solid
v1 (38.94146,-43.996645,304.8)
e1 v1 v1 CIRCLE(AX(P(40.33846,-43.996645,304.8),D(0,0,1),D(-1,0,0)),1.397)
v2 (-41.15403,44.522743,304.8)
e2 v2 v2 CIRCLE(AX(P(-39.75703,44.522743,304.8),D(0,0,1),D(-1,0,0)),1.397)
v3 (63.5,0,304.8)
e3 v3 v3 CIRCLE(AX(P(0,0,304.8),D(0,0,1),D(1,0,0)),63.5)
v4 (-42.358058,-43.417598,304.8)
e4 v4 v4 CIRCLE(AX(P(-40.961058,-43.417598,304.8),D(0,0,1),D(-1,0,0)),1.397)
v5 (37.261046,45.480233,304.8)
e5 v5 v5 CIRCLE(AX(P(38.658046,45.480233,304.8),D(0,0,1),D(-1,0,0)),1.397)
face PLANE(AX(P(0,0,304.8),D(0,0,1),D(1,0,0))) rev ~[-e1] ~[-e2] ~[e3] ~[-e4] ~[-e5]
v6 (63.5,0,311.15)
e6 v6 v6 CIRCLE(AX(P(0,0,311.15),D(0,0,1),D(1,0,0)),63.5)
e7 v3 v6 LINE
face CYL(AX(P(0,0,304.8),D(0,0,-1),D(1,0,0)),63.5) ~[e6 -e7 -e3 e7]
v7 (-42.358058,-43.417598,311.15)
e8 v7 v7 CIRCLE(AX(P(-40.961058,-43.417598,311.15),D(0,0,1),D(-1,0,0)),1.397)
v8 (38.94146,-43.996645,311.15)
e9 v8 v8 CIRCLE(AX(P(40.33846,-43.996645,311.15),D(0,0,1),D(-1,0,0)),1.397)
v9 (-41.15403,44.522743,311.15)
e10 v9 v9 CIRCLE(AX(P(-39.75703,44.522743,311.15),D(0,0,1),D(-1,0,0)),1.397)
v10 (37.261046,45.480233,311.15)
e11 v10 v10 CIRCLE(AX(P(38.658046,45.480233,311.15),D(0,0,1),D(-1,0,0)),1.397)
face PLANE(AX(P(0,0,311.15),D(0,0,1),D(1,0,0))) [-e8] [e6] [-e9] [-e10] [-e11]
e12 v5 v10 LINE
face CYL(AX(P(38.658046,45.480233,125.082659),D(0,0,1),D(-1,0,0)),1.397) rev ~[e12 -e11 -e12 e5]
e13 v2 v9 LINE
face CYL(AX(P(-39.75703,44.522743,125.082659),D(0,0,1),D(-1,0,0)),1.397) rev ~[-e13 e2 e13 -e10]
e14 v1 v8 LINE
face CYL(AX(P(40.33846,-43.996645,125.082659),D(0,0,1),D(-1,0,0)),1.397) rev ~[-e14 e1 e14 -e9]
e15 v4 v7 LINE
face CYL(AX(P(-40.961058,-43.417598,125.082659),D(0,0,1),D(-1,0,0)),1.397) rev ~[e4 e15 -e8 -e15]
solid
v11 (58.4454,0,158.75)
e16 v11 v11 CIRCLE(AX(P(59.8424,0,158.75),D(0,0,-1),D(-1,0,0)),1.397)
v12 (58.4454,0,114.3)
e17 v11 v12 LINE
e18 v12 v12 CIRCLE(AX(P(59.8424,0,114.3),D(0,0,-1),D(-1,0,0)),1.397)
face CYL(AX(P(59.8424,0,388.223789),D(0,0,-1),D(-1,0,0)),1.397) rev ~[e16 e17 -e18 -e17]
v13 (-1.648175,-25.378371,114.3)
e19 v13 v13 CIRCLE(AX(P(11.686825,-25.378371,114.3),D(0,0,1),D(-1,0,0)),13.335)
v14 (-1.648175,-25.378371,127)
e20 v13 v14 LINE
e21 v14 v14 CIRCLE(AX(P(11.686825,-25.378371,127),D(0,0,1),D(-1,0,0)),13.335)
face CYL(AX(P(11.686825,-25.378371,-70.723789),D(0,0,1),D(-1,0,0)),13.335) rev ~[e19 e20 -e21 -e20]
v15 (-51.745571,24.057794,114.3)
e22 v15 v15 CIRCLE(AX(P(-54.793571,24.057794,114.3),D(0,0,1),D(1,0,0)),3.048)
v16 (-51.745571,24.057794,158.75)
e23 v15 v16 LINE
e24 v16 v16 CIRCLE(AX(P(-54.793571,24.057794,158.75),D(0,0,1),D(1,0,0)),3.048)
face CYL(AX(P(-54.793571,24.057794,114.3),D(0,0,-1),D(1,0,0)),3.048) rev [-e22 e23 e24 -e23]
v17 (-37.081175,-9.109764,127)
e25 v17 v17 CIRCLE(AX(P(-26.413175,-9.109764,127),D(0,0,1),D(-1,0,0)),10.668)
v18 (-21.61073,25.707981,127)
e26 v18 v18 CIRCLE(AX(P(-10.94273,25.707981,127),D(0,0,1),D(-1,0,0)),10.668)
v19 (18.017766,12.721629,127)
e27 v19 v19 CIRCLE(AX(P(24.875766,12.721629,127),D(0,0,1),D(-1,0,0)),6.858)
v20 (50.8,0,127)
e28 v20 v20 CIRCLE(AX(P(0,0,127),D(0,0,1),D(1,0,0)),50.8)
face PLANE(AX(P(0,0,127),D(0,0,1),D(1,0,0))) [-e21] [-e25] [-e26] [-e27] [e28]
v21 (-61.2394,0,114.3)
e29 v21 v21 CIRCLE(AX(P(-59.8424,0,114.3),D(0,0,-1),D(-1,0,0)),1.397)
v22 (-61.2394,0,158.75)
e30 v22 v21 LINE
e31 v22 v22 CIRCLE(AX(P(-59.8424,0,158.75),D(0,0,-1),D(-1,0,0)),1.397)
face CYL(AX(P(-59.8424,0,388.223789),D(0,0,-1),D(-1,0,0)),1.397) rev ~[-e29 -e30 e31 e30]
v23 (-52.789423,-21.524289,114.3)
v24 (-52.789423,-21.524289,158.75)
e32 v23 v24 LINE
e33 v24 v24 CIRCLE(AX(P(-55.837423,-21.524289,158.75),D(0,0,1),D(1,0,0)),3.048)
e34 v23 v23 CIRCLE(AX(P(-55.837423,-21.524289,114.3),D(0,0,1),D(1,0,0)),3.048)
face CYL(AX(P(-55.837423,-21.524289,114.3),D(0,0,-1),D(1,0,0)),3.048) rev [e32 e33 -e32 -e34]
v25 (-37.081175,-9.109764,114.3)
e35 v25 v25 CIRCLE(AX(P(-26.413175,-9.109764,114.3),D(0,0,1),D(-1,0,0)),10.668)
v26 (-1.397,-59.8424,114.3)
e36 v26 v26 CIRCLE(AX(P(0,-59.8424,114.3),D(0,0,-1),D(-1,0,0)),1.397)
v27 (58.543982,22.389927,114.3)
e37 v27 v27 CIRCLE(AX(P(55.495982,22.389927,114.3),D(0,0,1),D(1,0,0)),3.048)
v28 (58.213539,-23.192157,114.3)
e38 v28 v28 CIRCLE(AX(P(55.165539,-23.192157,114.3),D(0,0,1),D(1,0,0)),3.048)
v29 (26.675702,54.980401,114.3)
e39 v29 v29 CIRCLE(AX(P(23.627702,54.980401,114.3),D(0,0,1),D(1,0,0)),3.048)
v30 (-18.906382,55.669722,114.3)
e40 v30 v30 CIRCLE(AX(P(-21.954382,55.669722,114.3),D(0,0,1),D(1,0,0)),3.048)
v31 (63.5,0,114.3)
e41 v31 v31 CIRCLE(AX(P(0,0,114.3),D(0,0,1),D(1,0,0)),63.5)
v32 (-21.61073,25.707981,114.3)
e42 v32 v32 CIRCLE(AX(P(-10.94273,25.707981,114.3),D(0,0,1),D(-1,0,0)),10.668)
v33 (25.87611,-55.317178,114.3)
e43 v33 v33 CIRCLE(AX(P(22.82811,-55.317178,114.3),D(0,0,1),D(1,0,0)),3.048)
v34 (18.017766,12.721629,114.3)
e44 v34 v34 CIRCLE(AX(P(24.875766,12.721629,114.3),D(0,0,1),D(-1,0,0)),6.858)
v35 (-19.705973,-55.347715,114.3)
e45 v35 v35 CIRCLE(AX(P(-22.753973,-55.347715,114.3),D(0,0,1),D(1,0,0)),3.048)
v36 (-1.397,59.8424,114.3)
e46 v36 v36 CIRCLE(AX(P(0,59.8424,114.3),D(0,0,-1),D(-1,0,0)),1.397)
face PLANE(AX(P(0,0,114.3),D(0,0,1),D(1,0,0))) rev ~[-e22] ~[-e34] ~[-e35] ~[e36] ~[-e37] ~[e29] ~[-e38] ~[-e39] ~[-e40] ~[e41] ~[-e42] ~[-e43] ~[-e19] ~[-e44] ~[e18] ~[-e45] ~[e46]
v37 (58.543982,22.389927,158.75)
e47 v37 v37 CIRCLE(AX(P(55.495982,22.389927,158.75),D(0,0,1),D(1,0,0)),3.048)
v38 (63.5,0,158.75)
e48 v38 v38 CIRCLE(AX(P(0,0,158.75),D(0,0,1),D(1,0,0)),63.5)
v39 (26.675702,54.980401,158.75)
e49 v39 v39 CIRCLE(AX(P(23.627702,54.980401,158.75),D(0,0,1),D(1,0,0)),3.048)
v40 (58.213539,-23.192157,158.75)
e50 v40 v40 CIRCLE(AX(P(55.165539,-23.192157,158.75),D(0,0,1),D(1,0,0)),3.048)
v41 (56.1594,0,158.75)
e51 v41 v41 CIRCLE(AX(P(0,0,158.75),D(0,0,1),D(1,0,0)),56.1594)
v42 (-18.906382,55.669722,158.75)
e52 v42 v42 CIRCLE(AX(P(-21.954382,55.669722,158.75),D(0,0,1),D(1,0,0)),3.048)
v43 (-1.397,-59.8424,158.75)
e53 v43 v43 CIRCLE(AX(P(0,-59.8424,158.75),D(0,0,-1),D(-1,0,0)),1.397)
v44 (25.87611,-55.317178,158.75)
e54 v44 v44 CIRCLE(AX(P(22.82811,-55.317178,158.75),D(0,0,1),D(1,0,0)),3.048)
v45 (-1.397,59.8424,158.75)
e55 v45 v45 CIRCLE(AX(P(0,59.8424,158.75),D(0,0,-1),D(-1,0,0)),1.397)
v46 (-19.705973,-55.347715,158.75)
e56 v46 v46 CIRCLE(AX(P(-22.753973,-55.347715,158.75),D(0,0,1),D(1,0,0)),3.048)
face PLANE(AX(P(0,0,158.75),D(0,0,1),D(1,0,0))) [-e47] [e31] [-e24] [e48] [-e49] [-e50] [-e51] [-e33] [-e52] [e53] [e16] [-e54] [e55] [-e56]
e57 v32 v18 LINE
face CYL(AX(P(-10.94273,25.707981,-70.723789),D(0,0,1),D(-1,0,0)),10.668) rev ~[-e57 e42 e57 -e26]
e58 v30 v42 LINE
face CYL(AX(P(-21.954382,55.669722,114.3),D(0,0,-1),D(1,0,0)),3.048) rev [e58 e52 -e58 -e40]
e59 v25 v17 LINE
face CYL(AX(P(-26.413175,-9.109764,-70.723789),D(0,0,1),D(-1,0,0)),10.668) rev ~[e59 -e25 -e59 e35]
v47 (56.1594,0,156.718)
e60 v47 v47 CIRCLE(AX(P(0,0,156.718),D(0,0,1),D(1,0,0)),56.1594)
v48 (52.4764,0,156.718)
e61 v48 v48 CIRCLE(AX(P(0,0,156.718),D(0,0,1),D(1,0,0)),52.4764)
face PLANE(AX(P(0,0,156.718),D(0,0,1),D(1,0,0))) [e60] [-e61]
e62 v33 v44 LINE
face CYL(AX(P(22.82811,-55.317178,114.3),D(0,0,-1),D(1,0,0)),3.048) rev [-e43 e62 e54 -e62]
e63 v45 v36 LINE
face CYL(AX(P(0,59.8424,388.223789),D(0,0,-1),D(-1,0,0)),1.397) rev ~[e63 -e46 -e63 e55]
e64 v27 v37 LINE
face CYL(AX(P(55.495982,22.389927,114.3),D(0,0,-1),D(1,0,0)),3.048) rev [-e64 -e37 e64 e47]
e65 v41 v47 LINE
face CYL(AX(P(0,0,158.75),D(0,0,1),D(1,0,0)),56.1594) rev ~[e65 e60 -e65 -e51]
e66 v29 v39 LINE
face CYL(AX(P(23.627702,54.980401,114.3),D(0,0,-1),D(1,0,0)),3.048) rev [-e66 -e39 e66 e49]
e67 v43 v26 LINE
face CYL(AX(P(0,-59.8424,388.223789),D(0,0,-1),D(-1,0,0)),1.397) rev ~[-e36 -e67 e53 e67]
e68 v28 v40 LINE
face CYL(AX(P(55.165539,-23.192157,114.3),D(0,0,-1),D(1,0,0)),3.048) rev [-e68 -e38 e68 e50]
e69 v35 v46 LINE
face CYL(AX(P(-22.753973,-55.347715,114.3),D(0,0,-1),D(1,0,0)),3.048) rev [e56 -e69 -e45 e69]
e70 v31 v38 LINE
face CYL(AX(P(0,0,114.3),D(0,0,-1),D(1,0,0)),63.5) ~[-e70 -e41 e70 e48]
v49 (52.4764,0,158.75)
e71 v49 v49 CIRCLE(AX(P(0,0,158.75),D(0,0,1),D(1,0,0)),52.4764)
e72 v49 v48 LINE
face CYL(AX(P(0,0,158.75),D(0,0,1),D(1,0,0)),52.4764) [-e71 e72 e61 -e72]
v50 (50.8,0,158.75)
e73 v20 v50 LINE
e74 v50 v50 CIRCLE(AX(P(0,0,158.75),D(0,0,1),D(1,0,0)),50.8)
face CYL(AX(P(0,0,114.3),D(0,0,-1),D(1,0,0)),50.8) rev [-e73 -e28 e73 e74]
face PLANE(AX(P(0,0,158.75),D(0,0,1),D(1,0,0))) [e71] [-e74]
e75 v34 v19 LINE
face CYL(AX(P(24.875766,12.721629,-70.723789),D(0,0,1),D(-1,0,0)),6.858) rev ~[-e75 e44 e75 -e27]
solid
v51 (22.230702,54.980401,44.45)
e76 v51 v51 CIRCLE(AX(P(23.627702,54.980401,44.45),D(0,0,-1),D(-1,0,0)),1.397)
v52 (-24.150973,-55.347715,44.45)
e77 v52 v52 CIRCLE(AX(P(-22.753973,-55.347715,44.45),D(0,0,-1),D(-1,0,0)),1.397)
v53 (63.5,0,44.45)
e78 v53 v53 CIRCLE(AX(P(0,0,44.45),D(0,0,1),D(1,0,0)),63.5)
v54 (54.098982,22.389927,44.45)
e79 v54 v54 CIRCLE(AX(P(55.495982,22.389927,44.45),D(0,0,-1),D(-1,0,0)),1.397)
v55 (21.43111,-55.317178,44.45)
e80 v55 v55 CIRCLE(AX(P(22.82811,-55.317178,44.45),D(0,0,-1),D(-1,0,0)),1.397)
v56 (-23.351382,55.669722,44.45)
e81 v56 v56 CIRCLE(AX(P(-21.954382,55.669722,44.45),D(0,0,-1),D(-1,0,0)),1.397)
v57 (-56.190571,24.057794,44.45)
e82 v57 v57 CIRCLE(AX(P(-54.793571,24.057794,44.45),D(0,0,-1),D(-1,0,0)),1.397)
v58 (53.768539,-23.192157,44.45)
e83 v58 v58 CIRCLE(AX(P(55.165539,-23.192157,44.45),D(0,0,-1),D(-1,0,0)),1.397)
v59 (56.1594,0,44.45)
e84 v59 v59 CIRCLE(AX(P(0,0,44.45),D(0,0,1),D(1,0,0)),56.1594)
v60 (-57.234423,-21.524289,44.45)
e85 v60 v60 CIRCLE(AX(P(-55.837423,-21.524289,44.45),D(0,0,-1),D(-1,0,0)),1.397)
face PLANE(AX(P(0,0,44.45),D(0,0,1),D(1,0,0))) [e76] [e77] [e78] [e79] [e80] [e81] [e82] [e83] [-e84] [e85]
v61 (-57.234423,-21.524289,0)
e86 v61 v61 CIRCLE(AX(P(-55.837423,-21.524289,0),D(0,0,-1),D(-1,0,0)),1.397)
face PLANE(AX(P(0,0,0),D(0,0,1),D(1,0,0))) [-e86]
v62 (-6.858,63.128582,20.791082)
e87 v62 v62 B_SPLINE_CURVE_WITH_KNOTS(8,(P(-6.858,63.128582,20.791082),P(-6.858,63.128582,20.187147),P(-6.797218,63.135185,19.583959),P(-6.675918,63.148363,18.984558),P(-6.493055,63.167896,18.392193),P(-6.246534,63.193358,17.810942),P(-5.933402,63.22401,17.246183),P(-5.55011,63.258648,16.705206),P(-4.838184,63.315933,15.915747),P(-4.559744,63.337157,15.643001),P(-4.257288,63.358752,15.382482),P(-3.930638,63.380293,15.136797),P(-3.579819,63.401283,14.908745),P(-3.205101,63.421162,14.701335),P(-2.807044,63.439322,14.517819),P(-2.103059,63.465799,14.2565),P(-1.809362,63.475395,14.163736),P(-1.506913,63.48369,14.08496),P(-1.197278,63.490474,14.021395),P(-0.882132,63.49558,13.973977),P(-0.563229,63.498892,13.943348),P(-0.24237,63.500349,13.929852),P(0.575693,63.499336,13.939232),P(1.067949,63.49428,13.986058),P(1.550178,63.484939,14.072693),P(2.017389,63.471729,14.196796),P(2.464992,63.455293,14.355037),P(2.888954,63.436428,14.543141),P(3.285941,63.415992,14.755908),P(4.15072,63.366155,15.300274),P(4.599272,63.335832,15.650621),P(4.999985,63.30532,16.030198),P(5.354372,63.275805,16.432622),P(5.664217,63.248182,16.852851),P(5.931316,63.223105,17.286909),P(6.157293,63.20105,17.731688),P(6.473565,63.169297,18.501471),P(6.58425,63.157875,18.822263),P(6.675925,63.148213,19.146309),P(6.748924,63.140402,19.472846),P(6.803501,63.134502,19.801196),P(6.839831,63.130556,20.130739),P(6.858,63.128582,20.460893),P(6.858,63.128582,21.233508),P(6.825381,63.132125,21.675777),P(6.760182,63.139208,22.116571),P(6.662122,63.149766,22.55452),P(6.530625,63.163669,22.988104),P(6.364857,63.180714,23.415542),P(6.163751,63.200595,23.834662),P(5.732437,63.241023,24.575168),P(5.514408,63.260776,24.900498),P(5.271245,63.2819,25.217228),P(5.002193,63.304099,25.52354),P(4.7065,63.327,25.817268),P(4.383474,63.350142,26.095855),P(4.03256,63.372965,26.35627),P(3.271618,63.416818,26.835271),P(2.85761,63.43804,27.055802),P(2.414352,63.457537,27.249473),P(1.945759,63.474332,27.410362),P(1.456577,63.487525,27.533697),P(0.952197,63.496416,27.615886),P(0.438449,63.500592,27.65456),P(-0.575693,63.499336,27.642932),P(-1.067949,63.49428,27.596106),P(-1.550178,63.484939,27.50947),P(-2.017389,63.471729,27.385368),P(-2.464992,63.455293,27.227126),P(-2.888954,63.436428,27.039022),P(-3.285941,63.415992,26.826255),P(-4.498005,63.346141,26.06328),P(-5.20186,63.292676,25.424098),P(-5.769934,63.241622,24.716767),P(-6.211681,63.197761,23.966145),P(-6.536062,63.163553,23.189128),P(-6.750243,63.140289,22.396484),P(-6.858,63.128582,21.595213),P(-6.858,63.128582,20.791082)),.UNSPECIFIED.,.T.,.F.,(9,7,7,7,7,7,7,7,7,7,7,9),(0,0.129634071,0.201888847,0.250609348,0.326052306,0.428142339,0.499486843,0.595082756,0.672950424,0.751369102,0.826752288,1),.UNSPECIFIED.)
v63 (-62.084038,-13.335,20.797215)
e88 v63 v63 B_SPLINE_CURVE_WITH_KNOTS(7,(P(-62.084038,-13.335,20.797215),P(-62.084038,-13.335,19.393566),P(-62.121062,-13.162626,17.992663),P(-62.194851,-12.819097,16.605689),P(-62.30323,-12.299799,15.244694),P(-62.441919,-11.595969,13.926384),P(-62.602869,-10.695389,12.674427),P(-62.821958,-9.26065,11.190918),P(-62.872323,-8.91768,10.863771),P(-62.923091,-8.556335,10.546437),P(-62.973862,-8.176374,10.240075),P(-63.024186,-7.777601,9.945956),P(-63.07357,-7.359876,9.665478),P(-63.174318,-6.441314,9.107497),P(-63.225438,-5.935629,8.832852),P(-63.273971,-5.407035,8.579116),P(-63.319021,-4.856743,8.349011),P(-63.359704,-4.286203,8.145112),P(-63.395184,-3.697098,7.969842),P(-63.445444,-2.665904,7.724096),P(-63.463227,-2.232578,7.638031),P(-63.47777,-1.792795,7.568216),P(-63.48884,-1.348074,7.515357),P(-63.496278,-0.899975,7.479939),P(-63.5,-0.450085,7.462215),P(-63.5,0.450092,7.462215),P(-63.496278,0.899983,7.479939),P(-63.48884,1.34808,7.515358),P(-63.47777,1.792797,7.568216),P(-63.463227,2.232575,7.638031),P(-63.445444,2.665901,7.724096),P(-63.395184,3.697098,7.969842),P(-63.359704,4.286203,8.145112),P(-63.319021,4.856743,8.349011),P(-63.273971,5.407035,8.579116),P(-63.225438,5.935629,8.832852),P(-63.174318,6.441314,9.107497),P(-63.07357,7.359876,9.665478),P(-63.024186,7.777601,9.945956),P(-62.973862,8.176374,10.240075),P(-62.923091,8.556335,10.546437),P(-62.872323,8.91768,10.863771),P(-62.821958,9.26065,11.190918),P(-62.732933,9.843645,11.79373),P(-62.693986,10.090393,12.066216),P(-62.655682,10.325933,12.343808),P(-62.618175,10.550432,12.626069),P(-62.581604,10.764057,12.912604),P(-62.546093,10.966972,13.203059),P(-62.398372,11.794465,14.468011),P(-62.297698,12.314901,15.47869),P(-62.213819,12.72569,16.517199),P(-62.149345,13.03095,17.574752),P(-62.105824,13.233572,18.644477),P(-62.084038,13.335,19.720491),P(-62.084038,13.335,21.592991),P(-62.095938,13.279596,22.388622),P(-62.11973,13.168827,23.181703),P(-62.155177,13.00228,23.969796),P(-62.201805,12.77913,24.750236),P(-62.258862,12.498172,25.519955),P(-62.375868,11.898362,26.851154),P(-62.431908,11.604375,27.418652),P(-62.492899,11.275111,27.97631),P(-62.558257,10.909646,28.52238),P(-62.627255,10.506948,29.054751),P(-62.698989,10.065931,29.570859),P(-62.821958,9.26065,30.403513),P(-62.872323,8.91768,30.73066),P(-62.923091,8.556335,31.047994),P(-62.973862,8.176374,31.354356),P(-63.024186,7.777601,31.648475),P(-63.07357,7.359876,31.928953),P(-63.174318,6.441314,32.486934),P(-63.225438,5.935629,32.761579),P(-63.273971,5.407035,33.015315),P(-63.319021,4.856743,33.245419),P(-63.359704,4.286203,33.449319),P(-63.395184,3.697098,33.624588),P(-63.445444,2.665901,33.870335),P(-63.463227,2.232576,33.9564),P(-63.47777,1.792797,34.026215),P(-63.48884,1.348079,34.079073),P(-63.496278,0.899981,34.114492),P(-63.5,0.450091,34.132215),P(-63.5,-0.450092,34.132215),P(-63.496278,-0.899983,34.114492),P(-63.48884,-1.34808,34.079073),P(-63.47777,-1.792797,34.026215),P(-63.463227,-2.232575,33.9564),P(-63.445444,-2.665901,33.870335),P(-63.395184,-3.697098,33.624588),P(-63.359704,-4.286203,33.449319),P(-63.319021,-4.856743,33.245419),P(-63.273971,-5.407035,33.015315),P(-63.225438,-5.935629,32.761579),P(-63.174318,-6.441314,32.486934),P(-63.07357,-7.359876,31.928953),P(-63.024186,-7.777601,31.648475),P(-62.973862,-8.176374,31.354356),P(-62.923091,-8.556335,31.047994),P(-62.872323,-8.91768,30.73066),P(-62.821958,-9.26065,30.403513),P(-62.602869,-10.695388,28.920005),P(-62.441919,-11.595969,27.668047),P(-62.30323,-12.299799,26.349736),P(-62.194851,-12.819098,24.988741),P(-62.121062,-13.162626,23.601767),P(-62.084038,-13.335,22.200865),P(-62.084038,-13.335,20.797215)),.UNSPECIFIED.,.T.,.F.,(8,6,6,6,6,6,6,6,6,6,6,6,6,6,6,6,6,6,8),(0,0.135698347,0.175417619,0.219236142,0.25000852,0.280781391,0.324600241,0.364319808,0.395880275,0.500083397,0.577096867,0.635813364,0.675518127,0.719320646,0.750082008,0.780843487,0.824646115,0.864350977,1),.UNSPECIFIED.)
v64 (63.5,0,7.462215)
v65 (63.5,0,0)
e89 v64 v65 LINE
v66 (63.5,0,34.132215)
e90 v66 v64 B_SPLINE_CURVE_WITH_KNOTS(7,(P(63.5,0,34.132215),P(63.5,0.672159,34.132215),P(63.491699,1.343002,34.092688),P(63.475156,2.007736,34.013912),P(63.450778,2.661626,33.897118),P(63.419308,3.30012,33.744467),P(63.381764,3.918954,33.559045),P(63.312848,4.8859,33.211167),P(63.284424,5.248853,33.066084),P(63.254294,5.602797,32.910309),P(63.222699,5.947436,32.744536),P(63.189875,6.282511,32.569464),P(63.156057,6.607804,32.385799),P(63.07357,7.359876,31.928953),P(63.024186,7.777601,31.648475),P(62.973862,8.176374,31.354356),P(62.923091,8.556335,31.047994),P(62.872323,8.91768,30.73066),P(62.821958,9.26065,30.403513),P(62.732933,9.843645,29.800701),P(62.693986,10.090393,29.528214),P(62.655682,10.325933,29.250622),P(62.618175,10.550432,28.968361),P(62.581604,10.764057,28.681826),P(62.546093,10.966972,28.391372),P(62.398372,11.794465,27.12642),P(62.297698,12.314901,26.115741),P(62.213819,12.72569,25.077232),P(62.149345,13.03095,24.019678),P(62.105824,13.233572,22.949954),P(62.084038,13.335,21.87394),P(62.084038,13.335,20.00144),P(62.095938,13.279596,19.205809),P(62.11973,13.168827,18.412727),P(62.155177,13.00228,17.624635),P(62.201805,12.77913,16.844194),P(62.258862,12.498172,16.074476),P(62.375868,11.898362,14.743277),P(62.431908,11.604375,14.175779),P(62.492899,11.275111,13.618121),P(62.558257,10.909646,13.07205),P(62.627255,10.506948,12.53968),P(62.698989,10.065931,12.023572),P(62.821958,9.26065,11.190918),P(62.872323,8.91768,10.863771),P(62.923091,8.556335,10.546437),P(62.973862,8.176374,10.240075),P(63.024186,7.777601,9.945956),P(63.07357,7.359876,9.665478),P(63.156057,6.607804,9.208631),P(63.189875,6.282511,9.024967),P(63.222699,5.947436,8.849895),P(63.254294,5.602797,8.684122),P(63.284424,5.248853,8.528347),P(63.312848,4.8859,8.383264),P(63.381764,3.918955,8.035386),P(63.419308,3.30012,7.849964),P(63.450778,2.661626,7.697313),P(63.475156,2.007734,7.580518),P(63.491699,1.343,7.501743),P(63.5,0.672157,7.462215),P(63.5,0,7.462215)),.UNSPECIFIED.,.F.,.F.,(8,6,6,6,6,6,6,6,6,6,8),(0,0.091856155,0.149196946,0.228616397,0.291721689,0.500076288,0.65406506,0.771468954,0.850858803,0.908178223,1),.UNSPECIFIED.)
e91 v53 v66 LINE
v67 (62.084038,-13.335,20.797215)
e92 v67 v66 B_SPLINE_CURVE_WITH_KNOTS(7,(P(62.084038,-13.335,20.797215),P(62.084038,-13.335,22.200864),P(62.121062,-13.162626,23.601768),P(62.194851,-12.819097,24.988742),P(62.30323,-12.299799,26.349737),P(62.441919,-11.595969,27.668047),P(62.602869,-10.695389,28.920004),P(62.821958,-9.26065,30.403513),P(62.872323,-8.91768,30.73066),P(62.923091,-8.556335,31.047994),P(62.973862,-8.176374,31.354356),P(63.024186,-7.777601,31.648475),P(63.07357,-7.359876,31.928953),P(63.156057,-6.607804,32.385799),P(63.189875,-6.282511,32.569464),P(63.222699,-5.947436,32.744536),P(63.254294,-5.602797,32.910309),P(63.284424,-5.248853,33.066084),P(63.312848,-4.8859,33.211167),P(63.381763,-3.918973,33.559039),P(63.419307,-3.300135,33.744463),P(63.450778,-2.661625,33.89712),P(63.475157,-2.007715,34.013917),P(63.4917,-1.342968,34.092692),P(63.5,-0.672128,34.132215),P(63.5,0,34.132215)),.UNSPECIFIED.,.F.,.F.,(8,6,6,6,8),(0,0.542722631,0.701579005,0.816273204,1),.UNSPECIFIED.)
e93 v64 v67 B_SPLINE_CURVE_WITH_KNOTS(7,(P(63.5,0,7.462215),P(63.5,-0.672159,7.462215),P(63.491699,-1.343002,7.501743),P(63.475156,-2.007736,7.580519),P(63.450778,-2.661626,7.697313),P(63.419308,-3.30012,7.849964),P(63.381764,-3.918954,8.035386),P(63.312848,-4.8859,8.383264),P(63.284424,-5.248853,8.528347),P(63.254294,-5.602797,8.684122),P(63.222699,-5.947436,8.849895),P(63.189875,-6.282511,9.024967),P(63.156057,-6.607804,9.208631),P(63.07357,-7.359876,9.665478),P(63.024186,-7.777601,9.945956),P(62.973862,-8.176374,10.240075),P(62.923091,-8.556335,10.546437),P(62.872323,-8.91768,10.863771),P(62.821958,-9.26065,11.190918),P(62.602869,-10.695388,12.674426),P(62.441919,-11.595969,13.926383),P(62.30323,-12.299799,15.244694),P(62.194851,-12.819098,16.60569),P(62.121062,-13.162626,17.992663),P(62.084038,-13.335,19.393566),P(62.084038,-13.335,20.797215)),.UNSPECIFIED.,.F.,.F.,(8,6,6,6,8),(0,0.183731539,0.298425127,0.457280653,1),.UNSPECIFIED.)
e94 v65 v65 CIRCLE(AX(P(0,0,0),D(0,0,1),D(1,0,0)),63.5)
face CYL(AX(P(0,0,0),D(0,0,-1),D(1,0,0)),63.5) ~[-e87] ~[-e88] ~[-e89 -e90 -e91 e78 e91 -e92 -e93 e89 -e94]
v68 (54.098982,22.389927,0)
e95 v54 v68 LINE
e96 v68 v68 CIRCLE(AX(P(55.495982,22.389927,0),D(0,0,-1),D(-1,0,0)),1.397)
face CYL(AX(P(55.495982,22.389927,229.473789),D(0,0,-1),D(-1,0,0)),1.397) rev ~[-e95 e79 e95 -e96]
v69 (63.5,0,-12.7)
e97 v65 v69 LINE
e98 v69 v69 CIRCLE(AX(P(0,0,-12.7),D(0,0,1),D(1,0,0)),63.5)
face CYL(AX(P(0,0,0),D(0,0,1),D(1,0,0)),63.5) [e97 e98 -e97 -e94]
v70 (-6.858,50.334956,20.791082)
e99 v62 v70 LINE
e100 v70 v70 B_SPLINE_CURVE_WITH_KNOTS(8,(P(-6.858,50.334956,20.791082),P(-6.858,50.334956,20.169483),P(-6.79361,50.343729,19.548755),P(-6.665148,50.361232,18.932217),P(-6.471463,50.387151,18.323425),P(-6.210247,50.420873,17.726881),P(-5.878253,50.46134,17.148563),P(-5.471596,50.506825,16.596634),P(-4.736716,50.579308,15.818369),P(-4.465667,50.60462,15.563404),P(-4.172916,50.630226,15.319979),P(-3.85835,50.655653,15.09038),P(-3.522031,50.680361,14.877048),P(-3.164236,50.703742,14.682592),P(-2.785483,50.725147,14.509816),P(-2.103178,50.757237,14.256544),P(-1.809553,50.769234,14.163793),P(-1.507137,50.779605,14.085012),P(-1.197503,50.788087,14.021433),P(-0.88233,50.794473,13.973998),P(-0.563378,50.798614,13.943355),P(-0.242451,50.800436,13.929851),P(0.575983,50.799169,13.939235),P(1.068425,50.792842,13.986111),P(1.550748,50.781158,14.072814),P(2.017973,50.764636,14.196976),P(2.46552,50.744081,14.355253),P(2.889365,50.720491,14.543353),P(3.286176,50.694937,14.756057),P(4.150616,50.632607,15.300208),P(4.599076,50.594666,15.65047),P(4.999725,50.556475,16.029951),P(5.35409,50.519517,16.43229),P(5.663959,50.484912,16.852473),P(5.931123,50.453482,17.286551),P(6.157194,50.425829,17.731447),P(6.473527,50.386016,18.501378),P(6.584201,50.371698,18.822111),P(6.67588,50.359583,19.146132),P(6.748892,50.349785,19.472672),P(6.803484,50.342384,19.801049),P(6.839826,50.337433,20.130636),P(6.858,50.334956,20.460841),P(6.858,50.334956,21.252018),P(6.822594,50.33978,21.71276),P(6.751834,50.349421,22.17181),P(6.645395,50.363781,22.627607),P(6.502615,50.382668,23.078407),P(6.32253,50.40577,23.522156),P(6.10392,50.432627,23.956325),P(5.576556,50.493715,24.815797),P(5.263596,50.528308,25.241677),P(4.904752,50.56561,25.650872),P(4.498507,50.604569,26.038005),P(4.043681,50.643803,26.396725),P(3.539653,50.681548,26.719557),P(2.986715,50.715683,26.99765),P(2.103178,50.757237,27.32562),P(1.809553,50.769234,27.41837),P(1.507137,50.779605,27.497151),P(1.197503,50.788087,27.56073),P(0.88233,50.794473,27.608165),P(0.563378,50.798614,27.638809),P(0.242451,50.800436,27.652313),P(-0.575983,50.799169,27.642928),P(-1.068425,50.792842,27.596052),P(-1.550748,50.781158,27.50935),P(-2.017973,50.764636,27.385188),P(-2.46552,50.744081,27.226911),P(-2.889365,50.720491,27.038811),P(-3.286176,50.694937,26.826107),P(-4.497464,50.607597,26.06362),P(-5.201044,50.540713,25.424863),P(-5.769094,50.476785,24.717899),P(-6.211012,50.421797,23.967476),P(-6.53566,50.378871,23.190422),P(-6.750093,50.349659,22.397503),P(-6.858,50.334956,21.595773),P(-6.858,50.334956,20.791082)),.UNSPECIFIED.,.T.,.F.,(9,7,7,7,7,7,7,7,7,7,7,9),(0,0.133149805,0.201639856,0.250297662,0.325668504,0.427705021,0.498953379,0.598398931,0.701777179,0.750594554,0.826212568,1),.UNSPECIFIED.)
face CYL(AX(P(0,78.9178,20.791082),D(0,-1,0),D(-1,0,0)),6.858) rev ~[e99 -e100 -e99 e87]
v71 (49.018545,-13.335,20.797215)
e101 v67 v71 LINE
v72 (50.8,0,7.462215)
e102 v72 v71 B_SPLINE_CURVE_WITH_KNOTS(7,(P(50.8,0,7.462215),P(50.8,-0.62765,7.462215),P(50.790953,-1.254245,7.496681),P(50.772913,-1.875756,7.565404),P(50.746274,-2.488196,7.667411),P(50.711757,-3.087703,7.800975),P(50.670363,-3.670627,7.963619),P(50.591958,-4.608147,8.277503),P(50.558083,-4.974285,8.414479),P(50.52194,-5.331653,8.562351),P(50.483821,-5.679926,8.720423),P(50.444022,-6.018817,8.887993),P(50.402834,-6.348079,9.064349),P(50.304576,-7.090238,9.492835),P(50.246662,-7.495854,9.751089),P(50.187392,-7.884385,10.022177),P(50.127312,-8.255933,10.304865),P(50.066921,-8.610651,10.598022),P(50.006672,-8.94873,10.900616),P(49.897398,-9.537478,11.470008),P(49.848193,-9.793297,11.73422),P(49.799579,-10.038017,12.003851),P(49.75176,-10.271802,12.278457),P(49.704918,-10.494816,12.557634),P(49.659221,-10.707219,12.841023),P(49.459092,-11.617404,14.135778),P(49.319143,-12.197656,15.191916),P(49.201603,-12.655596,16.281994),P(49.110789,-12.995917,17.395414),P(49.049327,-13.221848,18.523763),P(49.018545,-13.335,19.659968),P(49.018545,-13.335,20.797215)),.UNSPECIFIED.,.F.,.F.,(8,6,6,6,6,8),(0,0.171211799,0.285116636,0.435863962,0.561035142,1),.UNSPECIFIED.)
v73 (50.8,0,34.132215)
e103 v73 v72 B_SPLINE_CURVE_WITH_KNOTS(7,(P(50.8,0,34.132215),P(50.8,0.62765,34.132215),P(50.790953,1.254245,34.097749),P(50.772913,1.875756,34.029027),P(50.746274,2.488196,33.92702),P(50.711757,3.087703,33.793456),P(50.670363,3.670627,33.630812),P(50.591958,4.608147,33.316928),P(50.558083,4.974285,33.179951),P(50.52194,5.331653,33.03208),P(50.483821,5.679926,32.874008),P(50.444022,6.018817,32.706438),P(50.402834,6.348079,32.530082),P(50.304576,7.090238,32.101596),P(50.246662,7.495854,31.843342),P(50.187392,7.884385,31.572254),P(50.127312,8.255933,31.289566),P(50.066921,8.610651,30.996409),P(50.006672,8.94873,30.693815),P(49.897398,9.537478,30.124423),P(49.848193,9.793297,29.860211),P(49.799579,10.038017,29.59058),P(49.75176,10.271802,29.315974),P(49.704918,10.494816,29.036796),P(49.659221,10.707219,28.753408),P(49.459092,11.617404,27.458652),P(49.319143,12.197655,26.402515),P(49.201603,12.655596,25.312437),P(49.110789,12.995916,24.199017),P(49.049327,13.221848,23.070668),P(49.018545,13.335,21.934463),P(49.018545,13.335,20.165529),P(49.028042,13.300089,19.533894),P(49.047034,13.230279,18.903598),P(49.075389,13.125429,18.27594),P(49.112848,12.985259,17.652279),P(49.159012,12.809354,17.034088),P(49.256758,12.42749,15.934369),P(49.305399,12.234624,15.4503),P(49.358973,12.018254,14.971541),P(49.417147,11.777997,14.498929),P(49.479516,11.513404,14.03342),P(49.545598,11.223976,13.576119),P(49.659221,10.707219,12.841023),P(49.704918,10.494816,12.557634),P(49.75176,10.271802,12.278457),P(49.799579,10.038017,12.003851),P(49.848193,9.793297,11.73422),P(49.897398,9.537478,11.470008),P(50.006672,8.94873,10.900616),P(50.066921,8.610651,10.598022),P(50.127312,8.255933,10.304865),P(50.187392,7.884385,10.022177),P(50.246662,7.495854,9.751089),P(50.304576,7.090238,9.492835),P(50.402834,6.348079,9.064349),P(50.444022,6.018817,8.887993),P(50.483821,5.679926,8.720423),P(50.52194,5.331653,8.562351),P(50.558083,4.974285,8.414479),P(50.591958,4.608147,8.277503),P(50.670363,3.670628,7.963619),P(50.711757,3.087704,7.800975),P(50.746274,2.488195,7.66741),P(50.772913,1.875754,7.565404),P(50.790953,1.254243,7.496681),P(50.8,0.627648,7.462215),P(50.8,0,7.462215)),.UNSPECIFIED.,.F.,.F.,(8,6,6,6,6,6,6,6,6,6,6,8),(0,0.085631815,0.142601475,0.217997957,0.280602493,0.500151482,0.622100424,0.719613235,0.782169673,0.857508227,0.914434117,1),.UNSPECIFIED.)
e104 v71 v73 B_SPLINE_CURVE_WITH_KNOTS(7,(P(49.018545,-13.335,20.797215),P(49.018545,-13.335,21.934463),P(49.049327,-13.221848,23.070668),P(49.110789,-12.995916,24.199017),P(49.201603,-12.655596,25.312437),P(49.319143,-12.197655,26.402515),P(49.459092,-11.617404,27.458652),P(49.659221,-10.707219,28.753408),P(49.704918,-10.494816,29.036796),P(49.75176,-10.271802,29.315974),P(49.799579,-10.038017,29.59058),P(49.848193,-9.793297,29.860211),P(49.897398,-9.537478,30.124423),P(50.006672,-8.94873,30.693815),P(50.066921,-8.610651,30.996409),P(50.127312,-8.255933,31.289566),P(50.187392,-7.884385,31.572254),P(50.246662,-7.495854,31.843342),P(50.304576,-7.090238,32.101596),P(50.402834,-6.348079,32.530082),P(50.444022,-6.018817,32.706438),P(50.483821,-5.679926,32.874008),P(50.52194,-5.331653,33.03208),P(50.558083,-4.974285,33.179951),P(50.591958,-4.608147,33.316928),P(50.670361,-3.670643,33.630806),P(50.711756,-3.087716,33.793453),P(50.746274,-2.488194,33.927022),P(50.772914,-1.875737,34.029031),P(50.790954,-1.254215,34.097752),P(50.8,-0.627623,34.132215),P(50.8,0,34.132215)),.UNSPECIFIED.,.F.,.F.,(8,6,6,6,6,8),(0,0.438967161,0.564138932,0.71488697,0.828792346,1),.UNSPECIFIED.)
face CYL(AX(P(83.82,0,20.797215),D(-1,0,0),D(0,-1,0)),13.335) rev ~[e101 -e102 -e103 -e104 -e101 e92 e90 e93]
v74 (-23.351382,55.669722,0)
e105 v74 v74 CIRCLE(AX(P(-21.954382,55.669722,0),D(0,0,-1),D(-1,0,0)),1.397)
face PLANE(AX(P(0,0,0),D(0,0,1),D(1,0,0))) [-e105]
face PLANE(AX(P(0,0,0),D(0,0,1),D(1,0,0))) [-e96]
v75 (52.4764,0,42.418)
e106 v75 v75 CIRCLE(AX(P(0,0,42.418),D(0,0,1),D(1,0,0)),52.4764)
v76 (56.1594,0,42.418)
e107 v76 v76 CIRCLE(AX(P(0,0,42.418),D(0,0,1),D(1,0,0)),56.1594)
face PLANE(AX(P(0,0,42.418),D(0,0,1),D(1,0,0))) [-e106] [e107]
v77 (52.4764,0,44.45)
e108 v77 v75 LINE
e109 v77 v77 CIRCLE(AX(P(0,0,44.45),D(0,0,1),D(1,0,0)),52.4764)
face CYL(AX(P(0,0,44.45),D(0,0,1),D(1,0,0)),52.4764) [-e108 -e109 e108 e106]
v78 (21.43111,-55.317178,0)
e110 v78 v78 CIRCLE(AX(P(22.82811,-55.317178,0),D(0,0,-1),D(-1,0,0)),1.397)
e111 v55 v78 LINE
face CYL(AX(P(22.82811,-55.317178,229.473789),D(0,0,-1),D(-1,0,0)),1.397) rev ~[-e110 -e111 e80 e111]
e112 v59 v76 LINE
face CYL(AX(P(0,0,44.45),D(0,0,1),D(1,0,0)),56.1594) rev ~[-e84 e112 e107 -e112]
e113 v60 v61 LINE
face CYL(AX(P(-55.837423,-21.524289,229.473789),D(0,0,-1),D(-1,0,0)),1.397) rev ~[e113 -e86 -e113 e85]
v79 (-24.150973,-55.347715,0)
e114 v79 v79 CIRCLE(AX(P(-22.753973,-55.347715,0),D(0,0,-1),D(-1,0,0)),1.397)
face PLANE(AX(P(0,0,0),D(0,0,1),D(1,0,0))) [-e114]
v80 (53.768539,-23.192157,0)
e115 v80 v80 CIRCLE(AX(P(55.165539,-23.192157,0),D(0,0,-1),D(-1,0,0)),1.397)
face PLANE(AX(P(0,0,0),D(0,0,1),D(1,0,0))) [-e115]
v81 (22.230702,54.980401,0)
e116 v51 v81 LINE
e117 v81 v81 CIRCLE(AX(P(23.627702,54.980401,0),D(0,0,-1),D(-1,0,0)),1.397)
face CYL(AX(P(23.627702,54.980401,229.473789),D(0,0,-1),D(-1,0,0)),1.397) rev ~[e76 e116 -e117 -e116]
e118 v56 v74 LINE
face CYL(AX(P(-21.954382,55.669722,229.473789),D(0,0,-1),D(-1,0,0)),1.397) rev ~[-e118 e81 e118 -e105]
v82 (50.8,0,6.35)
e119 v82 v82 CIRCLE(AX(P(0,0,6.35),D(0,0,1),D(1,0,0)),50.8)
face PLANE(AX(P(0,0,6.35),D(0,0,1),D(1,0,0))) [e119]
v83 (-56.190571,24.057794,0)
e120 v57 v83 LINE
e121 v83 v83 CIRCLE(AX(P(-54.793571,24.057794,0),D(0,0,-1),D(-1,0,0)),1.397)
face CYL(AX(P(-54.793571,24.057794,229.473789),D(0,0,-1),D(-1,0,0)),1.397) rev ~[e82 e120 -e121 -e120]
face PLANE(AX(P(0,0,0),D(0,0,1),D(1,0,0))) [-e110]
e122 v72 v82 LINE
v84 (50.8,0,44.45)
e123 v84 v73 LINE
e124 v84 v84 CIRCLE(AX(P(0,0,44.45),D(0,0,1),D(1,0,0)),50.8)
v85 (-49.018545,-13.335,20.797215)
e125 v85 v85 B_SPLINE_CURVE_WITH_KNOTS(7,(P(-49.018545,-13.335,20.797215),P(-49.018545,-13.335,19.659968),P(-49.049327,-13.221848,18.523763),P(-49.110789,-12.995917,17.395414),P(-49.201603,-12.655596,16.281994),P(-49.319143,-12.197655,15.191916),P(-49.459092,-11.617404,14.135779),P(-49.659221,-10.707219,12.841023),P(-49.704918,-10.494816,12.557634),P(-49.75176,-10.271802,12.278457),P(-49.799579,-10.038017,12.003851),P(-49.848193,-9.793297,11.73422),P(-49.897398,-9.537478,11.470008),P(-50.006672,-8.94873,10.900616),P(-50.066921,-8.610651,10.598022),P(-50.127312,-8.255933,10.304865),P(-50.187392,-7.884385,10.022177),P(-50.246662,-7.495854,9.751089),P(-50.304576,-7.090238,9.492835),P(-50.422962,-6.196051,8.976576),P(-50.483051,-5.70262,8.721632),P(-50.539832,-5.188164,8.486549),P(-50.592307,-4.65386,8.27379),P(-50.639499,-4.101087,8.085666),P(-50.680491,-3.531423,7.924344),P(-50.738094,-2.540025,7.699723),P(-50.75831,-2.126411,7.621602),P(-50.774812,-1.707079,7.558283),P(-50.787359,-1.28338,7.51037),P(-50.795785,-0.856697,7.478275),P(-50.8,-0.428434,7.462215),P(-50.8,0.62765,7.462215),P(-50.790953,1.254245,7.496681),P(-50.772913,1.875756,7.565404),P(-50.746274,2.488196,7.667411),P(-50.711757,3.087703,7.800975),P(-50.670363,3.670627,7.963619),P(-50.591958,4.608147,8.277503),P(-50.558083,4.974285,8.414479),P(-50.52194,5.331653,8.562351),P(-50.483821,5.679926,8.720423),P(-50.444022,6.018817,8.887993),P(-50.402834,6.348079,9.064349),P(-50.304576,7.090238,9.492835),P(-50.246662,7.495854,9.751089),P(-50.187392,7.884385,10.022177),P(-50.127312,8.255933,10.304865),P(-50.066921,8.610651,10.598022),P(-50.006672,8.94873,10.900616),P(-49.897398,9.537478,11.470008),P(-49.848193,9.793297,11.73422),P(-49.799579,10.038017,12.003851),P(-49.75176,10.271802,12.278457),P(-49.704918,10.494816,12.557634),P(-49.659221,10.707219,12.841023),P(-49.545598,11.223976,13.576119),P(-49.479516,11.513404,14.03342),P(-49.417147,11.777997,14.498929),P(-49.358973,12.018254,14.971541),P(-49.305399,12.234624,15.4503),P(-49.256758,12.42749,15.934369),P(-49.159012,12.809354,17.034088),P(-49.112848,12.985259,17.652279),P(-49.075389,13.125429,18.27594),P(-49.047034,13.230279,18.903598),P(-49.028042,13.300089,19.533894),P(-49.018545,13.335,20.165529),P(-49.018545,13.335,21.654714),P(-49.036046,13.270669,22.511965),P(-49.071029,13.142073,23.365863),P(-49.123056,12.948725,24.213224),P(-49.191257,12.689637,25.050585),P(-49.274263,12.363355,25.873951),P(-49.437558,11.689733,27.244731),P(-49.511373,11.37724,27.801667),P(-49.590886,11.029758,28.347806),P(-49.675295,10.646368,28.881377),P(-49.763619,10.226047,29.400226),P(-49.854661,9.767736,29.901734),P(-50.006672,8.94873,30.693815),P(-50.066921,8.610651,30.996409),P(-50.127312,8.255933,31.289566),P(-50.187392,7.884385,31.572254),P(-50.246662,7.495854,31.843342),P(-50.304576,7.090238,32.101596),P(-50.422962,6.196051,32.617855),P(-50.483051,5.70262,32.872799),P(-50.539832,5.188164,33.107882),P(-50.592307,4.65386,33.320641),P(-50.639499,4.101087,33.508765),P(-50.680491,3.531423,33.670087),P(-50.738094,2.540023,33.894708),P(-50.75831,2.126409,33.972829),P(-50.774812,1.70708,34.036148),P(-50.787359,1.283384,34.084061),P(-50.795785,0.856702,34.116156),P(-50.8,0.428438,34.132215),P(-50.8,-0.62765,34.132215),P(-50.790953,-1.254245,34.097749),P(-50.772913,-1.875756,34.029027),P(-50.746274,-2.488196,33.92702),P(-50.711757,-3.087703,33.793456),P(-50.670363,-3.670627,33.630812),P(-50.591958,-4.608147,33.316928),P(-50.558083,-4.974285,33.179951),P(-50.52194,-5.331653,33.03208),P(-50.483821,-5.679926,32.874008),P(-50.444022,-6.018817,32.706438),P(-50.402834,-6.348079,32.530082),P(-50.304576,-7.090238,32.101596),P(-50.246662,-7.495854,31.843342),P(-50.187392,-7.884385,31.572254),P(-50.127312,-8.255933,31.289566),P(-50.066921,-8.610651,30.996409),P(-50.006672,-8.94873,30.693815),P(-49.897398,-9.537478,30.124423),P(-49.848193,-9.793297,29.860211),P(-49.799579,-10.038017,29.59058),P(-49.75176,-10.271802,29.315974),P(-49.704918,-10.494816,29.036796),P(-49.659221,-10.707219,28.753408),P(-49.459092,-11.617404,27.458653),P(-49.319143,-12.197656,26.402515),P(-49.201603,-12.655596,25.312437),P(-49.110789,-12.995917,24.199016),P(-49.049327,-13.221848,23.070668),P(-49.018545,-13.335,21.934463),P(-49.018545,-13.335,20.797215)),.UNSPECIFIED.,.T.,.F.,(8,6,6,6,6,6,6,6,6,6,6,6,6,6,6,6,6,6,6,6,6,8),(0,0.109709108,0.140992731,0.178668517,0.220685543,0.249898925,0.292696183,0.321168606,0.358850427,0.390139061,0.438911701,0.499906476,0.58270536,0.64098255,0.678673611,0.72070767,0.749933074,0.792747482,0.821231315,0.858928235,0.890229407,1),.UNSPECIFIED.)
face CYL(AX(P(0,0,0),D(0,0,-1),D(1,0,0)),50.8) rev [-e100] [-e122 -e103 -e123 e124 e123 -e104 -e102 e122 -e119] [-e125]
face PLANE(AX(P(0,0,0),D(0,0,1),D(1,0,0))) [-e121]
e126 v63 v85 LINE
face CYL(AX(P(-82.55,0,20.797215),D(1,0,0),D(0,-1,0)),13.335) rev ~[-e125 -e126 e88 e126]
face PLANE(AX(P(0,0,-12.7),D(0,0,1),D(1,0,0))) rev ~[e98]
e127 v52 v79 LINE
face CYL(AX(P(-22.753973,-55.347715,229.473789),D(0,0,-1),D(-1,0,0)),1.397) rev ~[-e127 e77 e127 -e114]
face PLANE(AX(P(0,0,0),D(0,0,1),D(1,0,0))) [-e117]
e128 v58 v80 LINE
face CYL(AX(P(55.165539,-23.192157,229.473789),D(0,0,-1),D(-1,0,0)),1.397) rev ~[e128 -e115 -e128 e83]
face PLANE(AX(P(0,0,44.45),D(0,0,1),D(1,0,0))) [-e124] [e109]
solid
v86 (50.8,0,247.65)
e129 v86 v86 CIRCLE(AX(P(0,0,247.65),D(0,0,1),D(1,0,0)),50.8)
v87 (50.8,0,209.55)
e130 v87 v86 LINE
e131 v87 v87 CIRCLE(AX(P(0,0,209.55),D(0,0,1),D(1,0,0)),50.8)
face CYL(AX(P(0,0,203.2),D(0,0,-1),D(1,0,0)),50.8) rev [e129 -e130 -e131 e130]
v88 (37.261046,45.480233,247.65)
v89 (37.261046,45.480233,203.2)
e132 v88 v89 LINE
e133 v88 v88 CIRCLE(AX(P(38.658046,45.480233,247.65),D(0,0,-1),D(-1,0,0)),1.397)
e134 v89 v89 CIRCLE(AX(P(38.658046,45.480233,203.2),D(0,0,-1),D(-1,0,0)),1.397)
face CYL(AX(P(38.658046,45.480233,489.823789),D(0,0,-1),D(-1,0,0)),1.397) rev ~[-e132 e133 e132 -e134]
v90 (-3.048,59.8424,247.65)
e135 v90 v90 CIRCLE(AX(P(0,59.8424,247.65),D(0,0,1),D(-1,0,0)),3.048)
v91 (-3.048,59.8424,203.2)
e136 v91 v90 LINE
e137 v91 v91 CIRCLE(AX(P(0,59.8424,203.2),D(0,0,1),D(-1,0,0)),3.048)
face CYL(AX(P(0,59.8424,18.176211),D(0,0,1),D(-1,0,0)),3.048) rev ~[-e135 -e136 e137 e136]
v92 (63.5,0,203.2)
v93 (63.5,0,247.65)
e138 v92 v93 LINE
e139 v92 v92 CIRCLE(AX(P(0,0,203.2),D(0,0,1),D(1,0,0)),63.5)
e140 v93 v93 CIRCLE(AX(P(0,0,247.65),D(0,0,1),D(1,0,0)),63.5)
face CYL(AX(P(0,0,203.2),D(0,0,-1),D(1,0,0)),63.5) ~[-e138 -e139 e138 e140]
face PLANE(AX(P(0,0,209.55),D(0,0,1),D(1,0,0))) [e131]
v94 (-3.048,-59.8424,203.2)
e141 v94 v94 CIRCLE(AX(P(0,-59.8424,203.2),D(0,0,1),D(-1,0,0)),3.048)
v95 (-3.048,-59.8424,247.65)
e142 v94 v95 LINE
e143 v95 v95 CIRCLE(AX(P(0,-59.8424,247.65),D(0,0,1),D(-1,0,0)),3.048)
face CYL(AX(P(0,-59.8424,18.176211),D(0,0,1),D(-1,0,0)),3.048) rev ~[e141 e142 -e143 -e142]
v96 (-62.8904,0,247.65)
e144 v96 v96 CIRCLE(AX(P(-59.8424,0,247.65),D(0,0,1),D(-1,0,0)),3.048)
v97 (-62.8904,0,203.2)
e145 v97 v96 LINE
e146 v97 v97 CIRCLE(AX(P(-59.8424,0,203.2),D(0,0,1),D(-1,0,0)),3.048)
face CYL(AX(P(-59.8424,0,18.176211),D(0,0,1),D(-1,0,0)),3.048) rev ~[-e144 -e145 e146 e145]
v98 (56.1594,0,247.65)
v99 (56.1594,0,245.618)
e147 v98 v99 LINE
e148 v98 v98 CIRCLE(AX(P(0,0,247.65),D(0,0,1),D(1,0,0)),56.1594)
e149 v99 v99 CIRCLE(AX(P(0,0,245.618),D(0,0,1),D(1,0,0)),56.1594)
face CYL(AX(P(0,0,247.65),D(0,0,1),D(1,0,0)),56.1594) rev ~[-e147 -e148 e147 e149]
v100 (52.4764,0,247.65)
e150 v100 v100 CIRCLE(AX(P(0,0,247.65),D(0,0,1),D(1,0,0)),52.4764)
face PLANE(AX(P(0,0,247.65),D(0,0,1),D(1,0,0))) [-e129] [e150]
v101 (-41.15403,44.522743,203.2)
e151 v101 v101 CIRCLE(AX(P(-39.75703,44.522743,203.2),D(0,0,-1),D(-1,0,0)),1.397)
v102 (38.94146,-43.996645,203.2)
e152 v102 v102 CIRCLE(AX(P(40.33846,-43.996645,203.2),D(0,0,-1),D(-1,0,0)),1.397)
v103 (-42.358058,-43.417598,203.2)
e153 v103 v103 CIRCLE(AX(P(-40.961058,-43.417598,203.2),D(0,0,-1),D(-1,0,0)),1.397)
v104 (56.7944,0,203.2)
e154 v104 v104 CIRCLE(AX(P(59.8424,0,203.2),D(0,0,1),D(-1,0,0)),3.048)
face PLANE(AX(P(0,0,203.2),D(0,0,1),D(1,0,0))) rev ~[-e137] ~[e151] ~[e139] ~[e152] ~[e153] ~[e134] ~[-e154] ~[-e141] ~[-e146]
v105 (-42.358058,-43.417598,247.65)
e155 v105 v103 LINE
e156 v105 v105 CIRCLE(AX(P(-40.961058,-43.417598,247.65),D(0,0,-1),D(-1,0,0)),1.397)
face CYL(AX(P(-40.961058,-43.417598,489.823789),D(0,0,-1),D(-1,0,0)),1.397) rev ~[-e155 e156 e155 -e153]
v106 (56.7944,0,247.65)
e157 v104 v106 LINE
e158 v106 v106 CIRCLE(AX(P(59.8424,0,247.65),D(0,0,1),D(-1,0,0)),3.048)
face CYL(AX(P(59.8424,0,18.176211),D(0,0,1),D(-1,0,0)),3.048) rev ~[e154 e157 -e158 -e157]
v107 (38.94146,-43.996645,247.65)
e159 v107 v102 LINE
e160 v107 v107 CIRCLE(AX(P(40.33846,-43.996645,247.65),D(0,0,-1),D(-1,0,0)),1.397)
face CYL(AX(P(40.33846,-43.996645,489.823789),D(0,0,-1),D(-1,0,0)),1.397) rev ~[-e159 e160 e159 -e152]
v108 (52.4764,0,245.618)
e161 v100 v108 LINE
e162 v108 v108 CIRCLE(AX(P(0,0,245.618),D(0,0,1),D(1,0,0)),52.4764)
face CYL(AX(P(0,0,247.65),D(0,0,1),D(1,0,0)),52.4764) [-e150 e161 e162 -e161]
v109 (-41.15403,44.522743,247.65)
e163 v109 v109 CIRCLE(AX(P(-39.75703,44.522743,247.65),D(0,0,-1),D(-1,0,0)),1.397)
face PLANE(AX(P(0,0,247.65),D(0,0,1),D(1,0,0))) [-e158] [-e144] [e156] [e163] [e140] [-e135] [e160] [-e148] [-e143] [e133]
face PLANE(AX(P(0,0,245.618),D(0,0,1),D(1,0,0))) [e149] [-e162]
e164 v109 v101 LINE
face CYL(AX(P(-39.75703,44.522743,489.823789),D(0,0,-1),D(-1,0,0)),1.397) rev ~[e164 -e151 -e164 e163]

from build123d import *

# Parameters (mm, degrees)
F0_R      = 63.5
F0_R_2    = 50.8
F1_DEPTH  = 44.45
F2_DEPTH  = 6.35
F3_R      = 63.5
F3_R_2    = 50.8
F4_DEPTH  = 25.4
F9_D      = 26.67
F9_DEPTH  = 20.32
F9_TIP    = 8.0124763547
F10_D     = 26.67
F10_DEPTH = 19.05
F10_TIP   = 8.0124763547
F12_R     = 63.5
F12_R_2   = 3.048
F12_R_3   = 50.8
F13_DEPTH = 44.45
F14_R     = 50.8
F15_DEPTH = 12.7
F17_D     = 26.67
F22_D     = 13.716
F22_DEPTH = 15.4178
F22_TIP   = 4.1207021253
F25_R     = 63.5
F26_DEPTH = 6.35
F27_D     = 2.794
F28_D     = 2.794
F19_R     = 63.5
F19_R_2   = 50.8
F29_DEPTH = 44.45
F23_R     = 50.8
F30_DEPTH = 6.35
F33_D     = 2.794
F34_D     = 2.794
F35_D     = 2.794
F36_D     = 2.794
F37_D     = 2.794
F38_D     = 2.794
F39_D     = 2.794
F40_D     = 2.794
F41_R     = 56.1594
F41_R_2   = 52.4764
F42_DEPTH = 2.032
F44_R     = 56.1594
F44_R_2   = 52.4764
F45_DEPTH = 2.032
F47_R     = 56.1594
F47_R_2   = 52.4764
F48_DEPTH = 2.032
F49_D     = 2.794
F50_D     = 6.096
F51_D     = 2.794
F52_D     = 6.096
F53_D     = 6.096
F54_D     = 6.096
F55_D     = 2.794
F56_D     = 2.794
F57_D     = 2.794
F58_D     = 2.794
F59_D     = 2.794
F60_D     = 2.794
F61_D     = 2.794
F62_D     = 2.794
F63_D     = 21.336
F64_D     = 21.336
F65_D     = 13.716
F66_DEPTH = 12.7


with BuildPart() as f1:
    # F0 (on Top) → F1 (new body)
    with BuildSketch(Plane.XY):
        Circle(F0_R)
        Circle(F0_R_2, mode=Mode.SUBTRACT)
    extrude(amount=F1_DEPTH)

    # F0 (on Top) → F2 (join)
    with BuildSketch(Plane.XY):
        Circle(F0_R_2)
    extrude(amount=F2_DEPTH)

    # F3 (on Top) → F4 (join)
    with BuildSketch(Plane.XY):
        Circle(F3_R)
        Circle(F3_R_2, mode=Mode.SUBTRACT)
    extrude(amount=F4_DEPTH)

    # F9
    with Locations(Plane.YZ.offset(63.5)):
        with Locations((0, 20.7972154021)):
            Hole(F9_D / 2, depth=F9_DEPTH)
            with Locations((0, 0, -(F9_DEPTH + F9_TIP / 2))):  # 118° drill point
                Cone(0, F9_D / 2, F9_TIP, mode=Mode.SUBTRACT)

    # F10
    with Locations(Plane(origin=(-63.5, 0, 0), x_dir=(0, 1, 0), z_dir=(-1, 0, 0))):
        with Locations((0, -20.7972154021)):
            Hole(F10_D / 2, depth=F10_DEPTH)
            with Locations((0, 0, -(F10_DEPTH + F10_TIP / 2))):  # 118° drill point
                Cone(0, F10_D / 2, F10_TIP, mode=Mode.SUBTRACT)

    # F22
    with Locations(Plane(origin=(0, 63.5, 0), x_dir=(1, 0, 0), z_dir=(0, 1, 0))):
        with Locations((0, -20.7910817116)):
            Hole(F22_D / 2, depth=F22_DEPTH)
            with Locations((0, 0, -(F22_DEPTH + F22_TIP / 2))):  # 118° drill point
                Cone(0, F22_D / 2, F22_TIP, mode=Mode.SUBTRACT)

    # F33 (through all)
    with Locations(Plane.XY.offset(44.45)):
        with Locations((-55.837423015, -21.5242892754)):
            Hole(F33_D / 2)

    # F34 (through all)
    with Locations(Plane.XY.offset(44.45)):
        with Locations((-22.7539731958, -55.3477148721)):
            Hole(F34_D / 2)

    # F35 (through all)
    with Locations(Plane.XY.offset(44.45)):
        with Locations((-54.7935706029, 24.0577941289)):
            Hole(F35_D / 2)

    # F36 (through all)
    with Locations(Plane.XY.offset(44.45)):
        with Locations((-21.9543816141, 55.669722163)):
            Hole(F36_D / 2)

    # F37 (through all)
    with Locations(Plane.XY.offset(44.45)):
        with Locations((23.6277017902, 54.9804014707)):
            Hole(F37_D / 2)

    # F38 (through all)
    with Locations(Plane.XY.offset(44.45)):
        with Locations((55.4959820047, 22.3899267327)):
            Hole(F38_D / 2)

    # F39 (through all)
    with Locations(Plane.XY.offset(44.45)):
        with Locations((55.1655391226, -23.1921566715)):
            Hole(F39_D / 2)

    # F40 (through all)
    with Locations(Plane.XY.offset(44.45)):
        with Locations((22.8281102084, -55.3171783633)):
            Hole(F40_D / 2)

    # F41 (on offset) → F42 (cut)
    with BuildSketch(Plane.XY.offset(44.45)):
        Circle(F41_R)
        Circle(F41_R_2, mode=Mode.SUBTRACT)
    extrude(amount=-F42_DEPTH, mode=Mode.SUBTRACT)

    # F0 (on Top) → F66 (join)
    with BuildSketch(Plane.XY):
        Circle(F0_R)
        Circle(F0_R_2, mode=Mode.SUBTRACT)
        Circle(F0_R_2)
    extrude(amount=-F66_DEPTH)


with BuildPart() as f13:
    # F12 (on offset) → F13 (new body)
    with BuildSketch(Plane.XY.offset(114.3)):
        Circle(F12_R)
        with Locations((-22.7539731958, -55.3477148721)):
            Circle(F12_R_2, mode=Mode.SUBTRACT)
        with Locations((-55.837423015, -21.5242892754)):
            Circle(F12_R_2, mode=Mode.SUBTRACT)
        with Locations((22.8281102084, -55.3171783633)):
            Circle(F12_R_2, mode=Mode.SUBTRACT)
        with Locations((55.1655391226, -23.1921566715)):
            Circle(F12_R_2, mode=Mode.SUBTRACT)
        with Locations((-54.7935706029, 24.0577941289)):
            Circle(F12_R_2, mode=Mode.SUBTRACT)
        with Locations((-21.9543816141, 55.669722163)):
            Circle(F12_R_2, mode=Mode.SUBTRACT)
        Circle(F12_R_3, mode=Mode.SUBTRACT)
        with Locations((55.4959820047, 22.3899267327)):
            Circle(F12_R_2, mode=Mode.SUBTRACT)
        with Locations((23.6277017902, 54.9804014707)):
            Circle(F12_R_2, mode=Mode.SUBTRACT)
    extrude(amount=F13_DEPTH)

    # F14 (on offset) → F15 (join)
    with BuildSketch(Plane.XY.offset(114.3)):
        Circle(F14_R)
    extrude(amount=F15_DEPTH)

    # F17 (through all)
    with Locations(Plane(origin=(0, 0, 114.3), x_dir=(1, 0, 0), z_dir=(0, 0, -1))):
        with Locations((11.686825238, 25.3783710245)):
            Hole(F17_D / 2)

    # F27 (through all)
    with Locations(Plane.XY.offset(203.2)):
        with Locations((0, 59.8424)):
            Hole(F27_D / 2)

    # F44 (on offset) → F45 (cut)
    with BuildSketch(Plane.XY.offset(158.75)):
        Circle(F44_R)
        Circle(F44_R_2, mode=Mode.SUBTRACT)
    extrude(amount=-F45_DEPTH, mode=Mode.SUBTRACT)

    # F49 (through all)
    with Locations(Plane.XY.offset(203.2)):
        with Locations((0, -59.8424)):
            Hole(F49_D / 2)

    # F51 (through all)
    with Locations(Plane.XY.offset(203.2)):
        with Locations((59.8424, 0)):
            Hole(F51_D / 2)

    # F55 (through all)
    with Locations(Plane.XY.offset(203.2)):
        with Locations((-59.8424, 0)):
            Hole(F55_D / 2)

    # F63 (through all)
    with Locations(Plane(origin=(0, 0, 114.3), x_dir=(1, 0, 0), z_dir=(0, 0, -1))):
        with Locations((-26.413174762, 9.1097639373)):
            Hole(F63_D / 2)

    # F64 (through all)
    with Locations(Plane(origin=(0, 0, 114.3), x_dir=(1, 0, 0), z_dir=(0, 0, -1))):
        with Locations((-10.942729788, -25.7079805661)):
            Hole(F64_D / 2)

    # F65 (through all)
    with Locations(Plane(origin=(0, 0, 114.3), x_dir=(1, 0, 0), z_dir=(0, 0, -1))):
        with Locations((24.8757664447, -12.7216289755)):
            Hole(F65_D / 2)


with BuildPart() as f26:
    # F25 (on offset) → F26 (new body)
    with BuildSketch(Plane.XY.offset(304.8)):
        Circle(F25_R)
    extrude(amount=F26_DEPTH)

    # F28 (through all)
    with Locations(Plane(origin=(0, 0, 304.8), x_dir=(1, 0, 0), z_dir=(0, 0, -1))):
        with Locations((-39.7570301478, -44.5227431076)):
            Hole(F28_D / 2)

    # F57 (through all)
    with Locations(Plane(origin=(0, 0, 304.8), x_dir=(1, 0, 0), z_dir=(0, 0, -1))):
        with Locations((-40.9610582496, 43.4175978962)):
            Hole(F57_D / 2)

    # F60 (through all)
    with Locations(Plane(origin=(0, 0, 304.8), x_dir=(1, 0, 0), z_dir=(0, 0, -1))):
        with Locations((40.3384601317, 43.9966445789)):
            Hole(F60_D / 2)

    # F61 (through all)
    with Locations(Plane(origin=(0, 0, 304.8), x_dir=(1, 0, 0), z_dir=(0, 0, -1))):
        with Locations((38.6580461216, -45.4802327397)):
            Hole(F61_D / 2)


with BuildPart() as f29:
    # F19 (on offset) → F29 (new body)
    with BuildSketch(Plane.XY.offset(203.2)):
        Circle(F19_R)
        Circle(F19_R_2, mode=Mode.SUBTRACT)
    extrude(amount=F29_DEPTH)

    # F23 (on offset) → F30 (join)
    with BuildSketch(Plane.XY.offset(203.2)):
        Circle(F23_R)
    extrude(amount=F30_DEPTH)

    # F47 (on offset) → F48 (cut)
    with BuildSketch(Plane.XY.offset(247.65)):
        Circle(F47_R)
        Circle(F47_R_2, mode=Mode.SUBTRACT)
    extrude(amount=-F48_DEPTH, mode=Mode.SUBTRACT)

    # F50 (through all)
    with Locations(Plane(origin=(0, 0, 203.2), x_dir=(1, 0, 0), z_dir=(0, 0, -1))):
        with Locations((0, 59.8424)):
            Hole(F50_D / 2)

    # F52 (through all)
    with Locations(Plane(origin=(0, 0, 203.2), x_dir=(1, 0, 0), z_dir=(0, 0, -1))):
        with Locations((59.8424, 0)):
            Hole(F52_D / 2)

    # F53 (through all)
    with Locations(Plane(origin=(0, 0, 203.2), x_dir=(1, 0, 0), z_dir=(0, 0, -1))):
        with Locations((0, -59.8424)):
            Hole(F53_D / 2)

    # F54 (through all)
    with Locations(Plane(origin=(0, 0, 203.2), x_dir=(1, 0, 0), z_dir=(0, 0, -1))):
        with Locations((-59.8424, 0)):
            Hole(F54_D / 2)

    # F56 (through all)
    with Locations(Plane.XY.offset(304.8)):
        with Locations((-39.7570301478, 44.5227431076)):
            Hole(F56_D / 2)

    # F58 (through all)
    with Locations(Plane.XY.offset(304.8)):
        with Locations((-40.9610582496, -43.4175978962)):
            Hole(F58_D / 2)

    # F59 (through all)
    with Locations(Plane.XY.offset(304.8)):
        with Locations((40.3384601317, -43.9966445789)):
            Hole(F59_D / 2)

    # F62 (through all)
    with Locations(Plane.XY.offset(304.8)):
        with Locations((38.6580461216, 45.4802327397)):
            Hole(F62_D / 2)


solid = Compound([f1.part, f13.part, f26.part, f29.part])
